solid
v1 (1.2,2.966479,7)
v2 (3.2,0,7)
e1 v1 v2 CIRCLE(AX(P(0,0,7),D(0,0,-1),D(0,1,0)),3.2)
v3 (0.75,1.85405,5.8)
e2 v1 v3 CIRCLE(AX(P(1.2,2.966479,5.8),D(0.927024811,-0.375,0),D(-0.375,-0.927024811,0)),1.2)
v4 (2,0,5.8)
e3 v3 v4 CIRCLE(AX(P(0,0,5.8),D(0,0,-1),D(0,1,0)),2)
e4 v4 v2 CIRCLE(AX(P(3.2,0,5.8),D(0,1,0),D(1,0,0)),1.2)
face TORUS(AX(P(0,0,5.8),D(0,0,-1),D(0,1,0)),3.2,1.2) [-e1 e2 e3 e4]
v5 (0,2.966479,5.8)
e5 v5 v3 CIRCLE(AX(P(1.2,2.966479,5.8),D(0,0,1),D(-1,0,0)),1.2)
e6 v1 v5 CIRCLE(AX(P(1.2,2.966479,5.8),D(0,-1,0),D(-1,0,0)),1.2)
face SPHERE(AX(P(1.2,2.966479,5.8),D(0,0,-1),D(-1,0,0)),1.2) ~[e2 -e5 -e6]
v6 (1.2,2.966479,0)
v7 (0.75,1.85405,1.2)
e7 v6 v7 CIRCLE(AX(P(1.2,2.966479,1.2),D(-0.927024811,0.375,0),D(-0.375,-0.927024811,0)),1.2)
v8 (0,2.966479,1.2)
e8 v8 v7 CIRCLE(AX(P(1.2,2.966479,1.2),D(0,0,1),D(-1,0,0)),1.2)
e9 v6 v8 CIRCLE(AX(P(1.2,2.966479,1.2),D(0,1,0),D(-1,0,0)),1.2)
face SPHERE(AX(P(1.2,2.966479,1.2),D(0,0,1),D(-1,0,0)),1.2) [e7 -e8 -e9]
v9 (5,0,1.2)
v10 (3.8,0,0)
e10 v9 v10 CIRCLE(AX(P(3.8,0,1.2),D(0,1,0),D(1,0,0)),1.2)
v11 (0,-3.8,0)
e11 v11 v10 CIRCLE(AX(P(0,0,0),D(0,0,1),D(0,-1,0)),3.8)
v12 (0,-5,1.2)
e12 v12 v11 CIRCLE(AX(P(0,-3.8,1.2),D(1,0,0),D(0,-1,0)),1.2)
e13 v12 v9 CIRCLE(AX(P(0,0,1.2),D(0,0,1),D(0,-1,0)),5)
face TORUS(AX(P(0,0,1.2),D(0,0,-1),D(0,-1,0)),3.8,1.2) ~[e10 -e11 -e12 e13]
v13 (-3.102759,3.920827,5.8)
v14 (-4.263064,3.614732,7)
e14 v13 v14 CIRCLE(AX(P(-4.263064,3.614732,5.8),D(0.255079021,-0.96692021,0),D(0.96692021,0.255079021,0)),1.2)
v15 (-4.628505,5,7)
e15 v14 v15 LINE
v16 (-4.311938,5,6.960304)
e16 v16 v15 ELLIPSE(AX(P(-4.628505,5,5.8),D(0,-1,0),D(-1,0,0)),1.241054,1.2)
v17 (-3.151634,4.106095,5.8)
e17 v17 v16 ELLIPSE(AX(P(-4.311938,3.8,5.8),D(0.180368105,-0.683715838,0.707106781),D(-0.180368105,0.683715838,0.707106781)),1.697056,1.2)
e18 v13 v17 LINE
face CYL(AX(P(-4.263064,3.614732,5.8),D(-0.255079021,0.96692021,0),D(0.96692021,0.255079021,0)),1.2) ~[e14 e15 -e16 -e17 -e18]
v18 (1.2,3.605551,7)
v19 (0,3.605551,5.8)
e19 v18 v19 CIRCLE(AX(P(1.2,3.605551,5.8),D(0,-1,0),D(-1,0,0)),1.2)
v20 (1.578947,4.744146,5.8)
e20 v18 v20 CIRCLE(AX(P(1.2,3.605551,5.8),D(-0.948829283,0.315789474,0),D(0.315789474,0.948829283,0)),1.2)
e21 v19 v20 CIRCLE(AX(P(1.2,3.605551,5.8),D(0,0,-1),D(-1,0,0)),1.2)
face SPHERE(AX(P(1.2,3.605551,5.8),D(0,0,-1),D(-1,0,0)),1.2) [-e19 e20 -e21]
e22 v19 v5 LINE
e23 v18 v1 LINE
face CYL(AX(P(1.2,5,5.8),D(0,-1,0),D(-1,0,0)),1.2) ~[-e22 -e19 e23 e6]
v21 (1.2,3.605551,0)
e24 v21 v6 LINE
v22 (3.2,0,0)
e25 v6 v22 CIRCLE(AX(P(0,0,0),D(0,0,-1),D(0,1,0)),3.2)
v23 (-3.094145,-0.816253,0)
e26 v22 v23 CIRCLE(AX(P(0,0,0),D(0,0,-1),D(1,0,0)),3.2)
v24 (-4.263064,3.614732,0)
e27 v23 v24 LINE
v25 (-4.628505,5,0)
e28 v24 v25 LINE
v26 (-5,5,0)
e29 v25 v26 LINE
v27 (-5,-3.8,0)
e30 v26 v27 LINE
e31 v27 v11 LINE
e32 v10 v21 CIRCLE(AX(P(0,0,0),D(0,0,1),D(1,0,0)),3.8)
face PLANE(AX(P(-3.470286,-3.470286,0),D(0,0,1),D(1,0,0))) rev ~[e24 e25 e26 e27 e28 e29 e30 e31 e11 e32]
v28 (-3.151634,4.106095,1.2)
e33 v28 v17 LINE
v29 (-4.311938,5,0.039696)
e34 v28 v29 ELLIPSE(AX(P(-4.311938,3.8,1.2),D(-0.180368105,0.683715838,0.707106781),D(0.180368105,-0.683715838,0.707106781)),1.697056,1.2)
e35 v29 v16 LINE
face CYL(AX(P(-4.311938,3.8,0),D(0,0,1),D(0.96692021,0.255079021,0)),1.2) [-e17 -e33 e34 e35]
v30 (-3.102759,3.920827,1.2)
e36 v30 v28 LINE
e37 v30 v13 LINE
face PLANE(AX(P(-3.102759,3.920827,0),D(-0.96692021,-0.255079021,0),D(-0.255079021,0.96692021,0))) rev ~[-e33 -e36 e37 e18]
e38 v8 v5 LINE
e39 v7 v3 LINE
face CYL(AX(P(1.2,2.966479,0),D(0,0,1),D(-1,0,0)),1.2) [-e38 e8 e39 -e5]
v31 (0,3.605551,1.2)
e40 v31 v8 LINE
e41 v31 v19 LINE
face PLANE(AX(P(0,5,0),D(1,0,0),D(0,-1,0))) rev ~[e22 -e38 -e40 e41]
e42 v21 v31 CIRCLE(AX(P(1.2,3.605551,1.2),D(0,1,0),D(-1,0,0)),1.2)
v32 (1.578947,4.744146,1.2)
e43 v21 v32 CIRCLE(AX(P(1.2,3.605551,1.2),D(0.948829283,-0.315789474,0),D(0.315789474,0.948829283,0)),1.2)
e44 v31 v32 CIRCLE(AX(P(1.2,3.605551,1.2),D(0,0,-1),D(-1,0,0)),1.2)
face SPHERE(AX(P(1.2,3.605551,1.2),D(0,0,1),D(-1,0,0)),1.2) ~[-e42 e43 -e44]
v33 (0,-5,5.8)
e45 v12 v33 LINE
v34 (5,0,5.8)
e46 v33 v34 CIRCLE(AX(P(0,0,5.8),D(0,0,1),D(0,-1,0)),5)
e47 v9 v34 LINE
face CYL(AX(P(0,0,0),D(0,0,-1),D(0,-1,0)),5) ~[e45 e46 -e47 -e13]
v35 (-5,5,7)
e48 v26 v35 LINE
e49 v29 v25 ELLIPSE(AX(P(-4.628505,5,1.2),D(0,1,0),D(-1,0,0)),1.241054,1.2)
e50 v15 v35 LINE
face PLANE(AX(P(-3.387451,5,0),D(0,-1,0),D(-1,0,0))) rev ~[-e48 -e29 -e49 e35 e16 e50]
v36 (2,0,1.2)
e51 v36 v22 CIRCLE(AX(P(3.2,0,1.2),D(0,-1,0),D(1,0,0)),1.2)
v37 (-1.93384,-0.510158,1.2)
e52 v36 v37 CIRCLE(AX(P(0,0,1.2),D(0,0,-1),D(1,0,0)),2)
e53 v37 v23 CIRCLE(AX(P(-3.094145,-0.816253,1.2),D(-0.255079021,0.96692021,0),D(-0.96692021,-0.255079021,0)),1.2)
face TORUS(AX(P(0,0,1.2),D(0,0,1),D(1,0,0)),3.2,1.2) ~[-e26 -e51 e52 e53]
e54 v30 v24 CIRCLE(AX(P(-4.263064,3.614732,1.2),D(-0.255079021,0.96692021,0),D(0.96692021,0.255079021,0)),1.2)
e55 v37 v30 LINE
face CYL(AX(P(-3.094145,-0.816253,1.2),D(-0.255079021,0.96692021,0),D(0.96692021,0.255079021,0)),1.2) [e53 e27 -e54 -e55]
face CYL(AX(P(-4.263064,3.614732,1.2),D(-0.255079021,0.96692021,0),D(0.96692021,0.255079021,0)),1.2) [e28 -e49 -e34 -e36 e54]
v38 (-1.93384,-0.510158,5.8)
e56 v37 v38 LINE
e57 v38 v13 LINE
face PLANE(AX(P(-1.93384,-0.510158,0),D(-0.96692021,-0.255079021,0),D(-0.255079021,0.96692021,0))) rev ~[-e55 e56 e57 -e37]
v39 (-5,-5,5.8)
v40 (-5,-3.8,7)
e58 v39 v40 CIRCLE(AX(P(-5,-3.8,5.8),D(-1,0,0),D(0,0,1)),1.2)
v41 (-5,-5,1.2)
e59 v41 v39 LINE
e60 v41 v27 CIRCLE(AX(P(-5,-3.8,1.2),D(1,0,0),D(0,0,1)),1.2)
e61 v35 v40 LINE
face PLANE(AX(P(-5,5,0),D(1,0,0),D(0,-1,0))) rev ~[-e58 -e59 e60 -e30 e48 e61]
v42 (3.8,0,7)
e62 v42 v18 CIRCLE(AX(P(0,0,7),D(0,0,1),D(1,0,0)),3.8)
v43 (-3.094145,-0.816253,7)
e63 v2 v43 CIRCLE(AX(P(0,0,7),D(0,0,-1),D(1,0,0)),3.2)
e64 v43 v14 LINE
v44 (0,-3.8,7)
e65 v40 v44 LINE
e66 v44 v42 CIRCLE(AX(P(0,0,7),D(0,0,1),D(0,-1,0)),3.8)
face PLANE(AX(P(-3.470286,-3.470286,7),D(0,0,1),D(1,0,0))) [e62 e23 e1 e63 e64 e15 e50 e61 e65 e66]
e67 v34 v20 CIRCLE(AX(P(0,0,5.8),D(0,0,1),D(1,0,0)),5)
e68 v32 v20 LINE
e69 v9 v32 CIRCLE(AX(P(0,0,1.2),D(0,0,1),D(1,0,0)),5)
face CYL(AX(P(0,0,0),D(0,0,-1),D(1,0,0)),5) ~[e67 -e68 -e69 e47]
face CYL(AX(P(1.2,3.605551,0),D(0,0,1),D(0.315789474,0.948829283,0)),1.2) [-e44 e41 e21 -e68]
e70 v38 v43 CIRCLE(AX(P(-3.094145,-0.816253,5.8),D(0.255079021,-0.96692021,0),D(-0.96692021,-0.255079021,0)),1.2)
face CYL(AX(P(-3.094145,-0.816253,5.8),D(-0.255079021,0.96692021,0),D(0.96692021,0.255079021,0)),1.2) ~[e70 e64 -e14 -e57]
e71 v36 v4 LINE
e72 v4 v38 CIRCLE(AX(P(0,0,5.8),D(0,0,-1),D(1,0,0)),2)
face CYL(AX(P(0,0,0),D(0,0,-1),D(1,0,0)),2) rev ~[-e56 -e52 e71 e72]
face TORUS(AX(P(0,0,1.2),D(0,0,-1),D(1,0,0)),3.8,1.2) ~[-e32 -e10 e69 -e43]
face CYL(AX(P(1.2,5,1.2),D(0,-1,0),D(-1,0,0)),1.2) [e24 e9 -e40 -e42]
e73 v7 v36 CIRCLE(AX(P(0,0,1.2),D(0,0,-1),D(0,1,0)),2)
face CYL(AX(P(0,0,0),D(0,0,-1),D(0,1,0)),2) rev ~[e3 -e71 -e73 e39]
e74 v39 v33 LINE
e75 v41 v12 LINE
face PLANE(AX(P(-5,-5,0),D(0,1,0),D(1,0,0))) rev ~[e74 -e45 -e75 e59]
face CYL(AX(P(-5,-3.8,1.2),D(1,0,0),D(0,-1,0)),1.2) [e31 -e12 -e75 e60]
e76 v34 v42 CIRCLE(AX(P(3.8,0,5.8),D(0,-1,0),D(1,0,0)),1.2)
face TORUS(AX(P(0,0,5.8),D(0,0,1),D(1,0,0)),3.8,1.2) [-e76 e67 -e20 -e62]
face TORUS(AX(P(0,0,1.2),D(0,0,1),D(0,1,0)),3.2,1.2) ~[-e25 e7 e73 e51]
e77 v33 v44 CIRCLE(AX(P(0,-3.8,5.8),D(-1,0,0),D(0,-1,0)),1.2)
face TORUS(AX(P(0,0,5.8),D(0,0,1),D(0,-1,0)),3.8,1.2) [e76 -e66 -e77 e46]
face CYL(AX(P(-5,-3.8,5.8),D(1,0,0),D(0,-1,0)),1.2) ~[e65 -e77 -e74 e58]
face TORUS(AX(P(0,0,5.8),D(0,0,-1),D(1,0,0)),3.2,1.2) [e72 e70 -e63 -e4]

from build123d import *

# Parameters (mm, degrees)
F1_DEPTH = 7
F2_R     = 1.2


# Not quite as in the source:
# - a feature names something its author has since deleted; it is built from what else it names


with BuildPart() as f1:
    # F0 (on Top) → F1 (new body)
    with BuildSketch(Plane.XY):
        with BuildLine():
            Line((-5, -5), (0, -5))
            ThreePointArc((0, -5), (-3.5355339059, -3.5355339059), (-5, 0))
            Line((-5, 0), (-5, -5))
        make_face()
        with BuildLine():
            ThreePointArc((0, -5), (3.5355339059, -3.5355339059), (5, 0))
            ThreePointArc((5, 0), (3.5355339059, 3.5355339059), (0, 5))
            Line((0, 5), (0, 2))
            ThreePointArc((0, 2), (1.4142135624, 1.4142135624), (2, 0))
            ThreePointArc((2, 0), (0.2572150448, -1.9833911416), (-1.9338404207, -0.5101580414))
            Line((-1.9338404207, -0.5101580414), (-3.1027593412, 3.9208270136))
            ThreePointArc((-3.1027593412, 3.9208270136), (-4.5007664184, 2.177866306), (-5, 0))
            ThreePointArc((-5, 0), (-3.5355339059, -3.5355339059), (0, -5))
        make_face()
        with BuildLine():
            ThreePointArc((-5, 0), (-4.5007664184, 2.177866306), (-3.1027593412, 3.9208270136))
            Line((-3.1027593412, 3.9208270136), (-3.3874512792, 5))
            Line((-3.3874512792, 5), (-5, 5))
            Line((-5, 5), (-5, 0))
        make_face()
    extrude(amount=F1_DEPTH)

    # F2
    f2_edges = [f1.edges().sort_by_distance(p)[0] for p in [
        (1.584348, -1.220591, 0),
        (1.584348, -1.220591, 7),
        (5, 0, 0),
        (5, 0, 7),
        (0, 5, 3.5),
        (0, 2, 3.5),
        (0, 3.5, 7),
        (0, 3.5, 0),
        (-3.387451, 5, 3.5),
        (-2.5, -5, 0),
        (-2.5, -5, 7),
        (-2.660646, 2.244921, 0),
        (-2.660646, 2.244921, 7),
    ]]
    fillet(f2_edges, radius=F2_R)


solid = f1.part
